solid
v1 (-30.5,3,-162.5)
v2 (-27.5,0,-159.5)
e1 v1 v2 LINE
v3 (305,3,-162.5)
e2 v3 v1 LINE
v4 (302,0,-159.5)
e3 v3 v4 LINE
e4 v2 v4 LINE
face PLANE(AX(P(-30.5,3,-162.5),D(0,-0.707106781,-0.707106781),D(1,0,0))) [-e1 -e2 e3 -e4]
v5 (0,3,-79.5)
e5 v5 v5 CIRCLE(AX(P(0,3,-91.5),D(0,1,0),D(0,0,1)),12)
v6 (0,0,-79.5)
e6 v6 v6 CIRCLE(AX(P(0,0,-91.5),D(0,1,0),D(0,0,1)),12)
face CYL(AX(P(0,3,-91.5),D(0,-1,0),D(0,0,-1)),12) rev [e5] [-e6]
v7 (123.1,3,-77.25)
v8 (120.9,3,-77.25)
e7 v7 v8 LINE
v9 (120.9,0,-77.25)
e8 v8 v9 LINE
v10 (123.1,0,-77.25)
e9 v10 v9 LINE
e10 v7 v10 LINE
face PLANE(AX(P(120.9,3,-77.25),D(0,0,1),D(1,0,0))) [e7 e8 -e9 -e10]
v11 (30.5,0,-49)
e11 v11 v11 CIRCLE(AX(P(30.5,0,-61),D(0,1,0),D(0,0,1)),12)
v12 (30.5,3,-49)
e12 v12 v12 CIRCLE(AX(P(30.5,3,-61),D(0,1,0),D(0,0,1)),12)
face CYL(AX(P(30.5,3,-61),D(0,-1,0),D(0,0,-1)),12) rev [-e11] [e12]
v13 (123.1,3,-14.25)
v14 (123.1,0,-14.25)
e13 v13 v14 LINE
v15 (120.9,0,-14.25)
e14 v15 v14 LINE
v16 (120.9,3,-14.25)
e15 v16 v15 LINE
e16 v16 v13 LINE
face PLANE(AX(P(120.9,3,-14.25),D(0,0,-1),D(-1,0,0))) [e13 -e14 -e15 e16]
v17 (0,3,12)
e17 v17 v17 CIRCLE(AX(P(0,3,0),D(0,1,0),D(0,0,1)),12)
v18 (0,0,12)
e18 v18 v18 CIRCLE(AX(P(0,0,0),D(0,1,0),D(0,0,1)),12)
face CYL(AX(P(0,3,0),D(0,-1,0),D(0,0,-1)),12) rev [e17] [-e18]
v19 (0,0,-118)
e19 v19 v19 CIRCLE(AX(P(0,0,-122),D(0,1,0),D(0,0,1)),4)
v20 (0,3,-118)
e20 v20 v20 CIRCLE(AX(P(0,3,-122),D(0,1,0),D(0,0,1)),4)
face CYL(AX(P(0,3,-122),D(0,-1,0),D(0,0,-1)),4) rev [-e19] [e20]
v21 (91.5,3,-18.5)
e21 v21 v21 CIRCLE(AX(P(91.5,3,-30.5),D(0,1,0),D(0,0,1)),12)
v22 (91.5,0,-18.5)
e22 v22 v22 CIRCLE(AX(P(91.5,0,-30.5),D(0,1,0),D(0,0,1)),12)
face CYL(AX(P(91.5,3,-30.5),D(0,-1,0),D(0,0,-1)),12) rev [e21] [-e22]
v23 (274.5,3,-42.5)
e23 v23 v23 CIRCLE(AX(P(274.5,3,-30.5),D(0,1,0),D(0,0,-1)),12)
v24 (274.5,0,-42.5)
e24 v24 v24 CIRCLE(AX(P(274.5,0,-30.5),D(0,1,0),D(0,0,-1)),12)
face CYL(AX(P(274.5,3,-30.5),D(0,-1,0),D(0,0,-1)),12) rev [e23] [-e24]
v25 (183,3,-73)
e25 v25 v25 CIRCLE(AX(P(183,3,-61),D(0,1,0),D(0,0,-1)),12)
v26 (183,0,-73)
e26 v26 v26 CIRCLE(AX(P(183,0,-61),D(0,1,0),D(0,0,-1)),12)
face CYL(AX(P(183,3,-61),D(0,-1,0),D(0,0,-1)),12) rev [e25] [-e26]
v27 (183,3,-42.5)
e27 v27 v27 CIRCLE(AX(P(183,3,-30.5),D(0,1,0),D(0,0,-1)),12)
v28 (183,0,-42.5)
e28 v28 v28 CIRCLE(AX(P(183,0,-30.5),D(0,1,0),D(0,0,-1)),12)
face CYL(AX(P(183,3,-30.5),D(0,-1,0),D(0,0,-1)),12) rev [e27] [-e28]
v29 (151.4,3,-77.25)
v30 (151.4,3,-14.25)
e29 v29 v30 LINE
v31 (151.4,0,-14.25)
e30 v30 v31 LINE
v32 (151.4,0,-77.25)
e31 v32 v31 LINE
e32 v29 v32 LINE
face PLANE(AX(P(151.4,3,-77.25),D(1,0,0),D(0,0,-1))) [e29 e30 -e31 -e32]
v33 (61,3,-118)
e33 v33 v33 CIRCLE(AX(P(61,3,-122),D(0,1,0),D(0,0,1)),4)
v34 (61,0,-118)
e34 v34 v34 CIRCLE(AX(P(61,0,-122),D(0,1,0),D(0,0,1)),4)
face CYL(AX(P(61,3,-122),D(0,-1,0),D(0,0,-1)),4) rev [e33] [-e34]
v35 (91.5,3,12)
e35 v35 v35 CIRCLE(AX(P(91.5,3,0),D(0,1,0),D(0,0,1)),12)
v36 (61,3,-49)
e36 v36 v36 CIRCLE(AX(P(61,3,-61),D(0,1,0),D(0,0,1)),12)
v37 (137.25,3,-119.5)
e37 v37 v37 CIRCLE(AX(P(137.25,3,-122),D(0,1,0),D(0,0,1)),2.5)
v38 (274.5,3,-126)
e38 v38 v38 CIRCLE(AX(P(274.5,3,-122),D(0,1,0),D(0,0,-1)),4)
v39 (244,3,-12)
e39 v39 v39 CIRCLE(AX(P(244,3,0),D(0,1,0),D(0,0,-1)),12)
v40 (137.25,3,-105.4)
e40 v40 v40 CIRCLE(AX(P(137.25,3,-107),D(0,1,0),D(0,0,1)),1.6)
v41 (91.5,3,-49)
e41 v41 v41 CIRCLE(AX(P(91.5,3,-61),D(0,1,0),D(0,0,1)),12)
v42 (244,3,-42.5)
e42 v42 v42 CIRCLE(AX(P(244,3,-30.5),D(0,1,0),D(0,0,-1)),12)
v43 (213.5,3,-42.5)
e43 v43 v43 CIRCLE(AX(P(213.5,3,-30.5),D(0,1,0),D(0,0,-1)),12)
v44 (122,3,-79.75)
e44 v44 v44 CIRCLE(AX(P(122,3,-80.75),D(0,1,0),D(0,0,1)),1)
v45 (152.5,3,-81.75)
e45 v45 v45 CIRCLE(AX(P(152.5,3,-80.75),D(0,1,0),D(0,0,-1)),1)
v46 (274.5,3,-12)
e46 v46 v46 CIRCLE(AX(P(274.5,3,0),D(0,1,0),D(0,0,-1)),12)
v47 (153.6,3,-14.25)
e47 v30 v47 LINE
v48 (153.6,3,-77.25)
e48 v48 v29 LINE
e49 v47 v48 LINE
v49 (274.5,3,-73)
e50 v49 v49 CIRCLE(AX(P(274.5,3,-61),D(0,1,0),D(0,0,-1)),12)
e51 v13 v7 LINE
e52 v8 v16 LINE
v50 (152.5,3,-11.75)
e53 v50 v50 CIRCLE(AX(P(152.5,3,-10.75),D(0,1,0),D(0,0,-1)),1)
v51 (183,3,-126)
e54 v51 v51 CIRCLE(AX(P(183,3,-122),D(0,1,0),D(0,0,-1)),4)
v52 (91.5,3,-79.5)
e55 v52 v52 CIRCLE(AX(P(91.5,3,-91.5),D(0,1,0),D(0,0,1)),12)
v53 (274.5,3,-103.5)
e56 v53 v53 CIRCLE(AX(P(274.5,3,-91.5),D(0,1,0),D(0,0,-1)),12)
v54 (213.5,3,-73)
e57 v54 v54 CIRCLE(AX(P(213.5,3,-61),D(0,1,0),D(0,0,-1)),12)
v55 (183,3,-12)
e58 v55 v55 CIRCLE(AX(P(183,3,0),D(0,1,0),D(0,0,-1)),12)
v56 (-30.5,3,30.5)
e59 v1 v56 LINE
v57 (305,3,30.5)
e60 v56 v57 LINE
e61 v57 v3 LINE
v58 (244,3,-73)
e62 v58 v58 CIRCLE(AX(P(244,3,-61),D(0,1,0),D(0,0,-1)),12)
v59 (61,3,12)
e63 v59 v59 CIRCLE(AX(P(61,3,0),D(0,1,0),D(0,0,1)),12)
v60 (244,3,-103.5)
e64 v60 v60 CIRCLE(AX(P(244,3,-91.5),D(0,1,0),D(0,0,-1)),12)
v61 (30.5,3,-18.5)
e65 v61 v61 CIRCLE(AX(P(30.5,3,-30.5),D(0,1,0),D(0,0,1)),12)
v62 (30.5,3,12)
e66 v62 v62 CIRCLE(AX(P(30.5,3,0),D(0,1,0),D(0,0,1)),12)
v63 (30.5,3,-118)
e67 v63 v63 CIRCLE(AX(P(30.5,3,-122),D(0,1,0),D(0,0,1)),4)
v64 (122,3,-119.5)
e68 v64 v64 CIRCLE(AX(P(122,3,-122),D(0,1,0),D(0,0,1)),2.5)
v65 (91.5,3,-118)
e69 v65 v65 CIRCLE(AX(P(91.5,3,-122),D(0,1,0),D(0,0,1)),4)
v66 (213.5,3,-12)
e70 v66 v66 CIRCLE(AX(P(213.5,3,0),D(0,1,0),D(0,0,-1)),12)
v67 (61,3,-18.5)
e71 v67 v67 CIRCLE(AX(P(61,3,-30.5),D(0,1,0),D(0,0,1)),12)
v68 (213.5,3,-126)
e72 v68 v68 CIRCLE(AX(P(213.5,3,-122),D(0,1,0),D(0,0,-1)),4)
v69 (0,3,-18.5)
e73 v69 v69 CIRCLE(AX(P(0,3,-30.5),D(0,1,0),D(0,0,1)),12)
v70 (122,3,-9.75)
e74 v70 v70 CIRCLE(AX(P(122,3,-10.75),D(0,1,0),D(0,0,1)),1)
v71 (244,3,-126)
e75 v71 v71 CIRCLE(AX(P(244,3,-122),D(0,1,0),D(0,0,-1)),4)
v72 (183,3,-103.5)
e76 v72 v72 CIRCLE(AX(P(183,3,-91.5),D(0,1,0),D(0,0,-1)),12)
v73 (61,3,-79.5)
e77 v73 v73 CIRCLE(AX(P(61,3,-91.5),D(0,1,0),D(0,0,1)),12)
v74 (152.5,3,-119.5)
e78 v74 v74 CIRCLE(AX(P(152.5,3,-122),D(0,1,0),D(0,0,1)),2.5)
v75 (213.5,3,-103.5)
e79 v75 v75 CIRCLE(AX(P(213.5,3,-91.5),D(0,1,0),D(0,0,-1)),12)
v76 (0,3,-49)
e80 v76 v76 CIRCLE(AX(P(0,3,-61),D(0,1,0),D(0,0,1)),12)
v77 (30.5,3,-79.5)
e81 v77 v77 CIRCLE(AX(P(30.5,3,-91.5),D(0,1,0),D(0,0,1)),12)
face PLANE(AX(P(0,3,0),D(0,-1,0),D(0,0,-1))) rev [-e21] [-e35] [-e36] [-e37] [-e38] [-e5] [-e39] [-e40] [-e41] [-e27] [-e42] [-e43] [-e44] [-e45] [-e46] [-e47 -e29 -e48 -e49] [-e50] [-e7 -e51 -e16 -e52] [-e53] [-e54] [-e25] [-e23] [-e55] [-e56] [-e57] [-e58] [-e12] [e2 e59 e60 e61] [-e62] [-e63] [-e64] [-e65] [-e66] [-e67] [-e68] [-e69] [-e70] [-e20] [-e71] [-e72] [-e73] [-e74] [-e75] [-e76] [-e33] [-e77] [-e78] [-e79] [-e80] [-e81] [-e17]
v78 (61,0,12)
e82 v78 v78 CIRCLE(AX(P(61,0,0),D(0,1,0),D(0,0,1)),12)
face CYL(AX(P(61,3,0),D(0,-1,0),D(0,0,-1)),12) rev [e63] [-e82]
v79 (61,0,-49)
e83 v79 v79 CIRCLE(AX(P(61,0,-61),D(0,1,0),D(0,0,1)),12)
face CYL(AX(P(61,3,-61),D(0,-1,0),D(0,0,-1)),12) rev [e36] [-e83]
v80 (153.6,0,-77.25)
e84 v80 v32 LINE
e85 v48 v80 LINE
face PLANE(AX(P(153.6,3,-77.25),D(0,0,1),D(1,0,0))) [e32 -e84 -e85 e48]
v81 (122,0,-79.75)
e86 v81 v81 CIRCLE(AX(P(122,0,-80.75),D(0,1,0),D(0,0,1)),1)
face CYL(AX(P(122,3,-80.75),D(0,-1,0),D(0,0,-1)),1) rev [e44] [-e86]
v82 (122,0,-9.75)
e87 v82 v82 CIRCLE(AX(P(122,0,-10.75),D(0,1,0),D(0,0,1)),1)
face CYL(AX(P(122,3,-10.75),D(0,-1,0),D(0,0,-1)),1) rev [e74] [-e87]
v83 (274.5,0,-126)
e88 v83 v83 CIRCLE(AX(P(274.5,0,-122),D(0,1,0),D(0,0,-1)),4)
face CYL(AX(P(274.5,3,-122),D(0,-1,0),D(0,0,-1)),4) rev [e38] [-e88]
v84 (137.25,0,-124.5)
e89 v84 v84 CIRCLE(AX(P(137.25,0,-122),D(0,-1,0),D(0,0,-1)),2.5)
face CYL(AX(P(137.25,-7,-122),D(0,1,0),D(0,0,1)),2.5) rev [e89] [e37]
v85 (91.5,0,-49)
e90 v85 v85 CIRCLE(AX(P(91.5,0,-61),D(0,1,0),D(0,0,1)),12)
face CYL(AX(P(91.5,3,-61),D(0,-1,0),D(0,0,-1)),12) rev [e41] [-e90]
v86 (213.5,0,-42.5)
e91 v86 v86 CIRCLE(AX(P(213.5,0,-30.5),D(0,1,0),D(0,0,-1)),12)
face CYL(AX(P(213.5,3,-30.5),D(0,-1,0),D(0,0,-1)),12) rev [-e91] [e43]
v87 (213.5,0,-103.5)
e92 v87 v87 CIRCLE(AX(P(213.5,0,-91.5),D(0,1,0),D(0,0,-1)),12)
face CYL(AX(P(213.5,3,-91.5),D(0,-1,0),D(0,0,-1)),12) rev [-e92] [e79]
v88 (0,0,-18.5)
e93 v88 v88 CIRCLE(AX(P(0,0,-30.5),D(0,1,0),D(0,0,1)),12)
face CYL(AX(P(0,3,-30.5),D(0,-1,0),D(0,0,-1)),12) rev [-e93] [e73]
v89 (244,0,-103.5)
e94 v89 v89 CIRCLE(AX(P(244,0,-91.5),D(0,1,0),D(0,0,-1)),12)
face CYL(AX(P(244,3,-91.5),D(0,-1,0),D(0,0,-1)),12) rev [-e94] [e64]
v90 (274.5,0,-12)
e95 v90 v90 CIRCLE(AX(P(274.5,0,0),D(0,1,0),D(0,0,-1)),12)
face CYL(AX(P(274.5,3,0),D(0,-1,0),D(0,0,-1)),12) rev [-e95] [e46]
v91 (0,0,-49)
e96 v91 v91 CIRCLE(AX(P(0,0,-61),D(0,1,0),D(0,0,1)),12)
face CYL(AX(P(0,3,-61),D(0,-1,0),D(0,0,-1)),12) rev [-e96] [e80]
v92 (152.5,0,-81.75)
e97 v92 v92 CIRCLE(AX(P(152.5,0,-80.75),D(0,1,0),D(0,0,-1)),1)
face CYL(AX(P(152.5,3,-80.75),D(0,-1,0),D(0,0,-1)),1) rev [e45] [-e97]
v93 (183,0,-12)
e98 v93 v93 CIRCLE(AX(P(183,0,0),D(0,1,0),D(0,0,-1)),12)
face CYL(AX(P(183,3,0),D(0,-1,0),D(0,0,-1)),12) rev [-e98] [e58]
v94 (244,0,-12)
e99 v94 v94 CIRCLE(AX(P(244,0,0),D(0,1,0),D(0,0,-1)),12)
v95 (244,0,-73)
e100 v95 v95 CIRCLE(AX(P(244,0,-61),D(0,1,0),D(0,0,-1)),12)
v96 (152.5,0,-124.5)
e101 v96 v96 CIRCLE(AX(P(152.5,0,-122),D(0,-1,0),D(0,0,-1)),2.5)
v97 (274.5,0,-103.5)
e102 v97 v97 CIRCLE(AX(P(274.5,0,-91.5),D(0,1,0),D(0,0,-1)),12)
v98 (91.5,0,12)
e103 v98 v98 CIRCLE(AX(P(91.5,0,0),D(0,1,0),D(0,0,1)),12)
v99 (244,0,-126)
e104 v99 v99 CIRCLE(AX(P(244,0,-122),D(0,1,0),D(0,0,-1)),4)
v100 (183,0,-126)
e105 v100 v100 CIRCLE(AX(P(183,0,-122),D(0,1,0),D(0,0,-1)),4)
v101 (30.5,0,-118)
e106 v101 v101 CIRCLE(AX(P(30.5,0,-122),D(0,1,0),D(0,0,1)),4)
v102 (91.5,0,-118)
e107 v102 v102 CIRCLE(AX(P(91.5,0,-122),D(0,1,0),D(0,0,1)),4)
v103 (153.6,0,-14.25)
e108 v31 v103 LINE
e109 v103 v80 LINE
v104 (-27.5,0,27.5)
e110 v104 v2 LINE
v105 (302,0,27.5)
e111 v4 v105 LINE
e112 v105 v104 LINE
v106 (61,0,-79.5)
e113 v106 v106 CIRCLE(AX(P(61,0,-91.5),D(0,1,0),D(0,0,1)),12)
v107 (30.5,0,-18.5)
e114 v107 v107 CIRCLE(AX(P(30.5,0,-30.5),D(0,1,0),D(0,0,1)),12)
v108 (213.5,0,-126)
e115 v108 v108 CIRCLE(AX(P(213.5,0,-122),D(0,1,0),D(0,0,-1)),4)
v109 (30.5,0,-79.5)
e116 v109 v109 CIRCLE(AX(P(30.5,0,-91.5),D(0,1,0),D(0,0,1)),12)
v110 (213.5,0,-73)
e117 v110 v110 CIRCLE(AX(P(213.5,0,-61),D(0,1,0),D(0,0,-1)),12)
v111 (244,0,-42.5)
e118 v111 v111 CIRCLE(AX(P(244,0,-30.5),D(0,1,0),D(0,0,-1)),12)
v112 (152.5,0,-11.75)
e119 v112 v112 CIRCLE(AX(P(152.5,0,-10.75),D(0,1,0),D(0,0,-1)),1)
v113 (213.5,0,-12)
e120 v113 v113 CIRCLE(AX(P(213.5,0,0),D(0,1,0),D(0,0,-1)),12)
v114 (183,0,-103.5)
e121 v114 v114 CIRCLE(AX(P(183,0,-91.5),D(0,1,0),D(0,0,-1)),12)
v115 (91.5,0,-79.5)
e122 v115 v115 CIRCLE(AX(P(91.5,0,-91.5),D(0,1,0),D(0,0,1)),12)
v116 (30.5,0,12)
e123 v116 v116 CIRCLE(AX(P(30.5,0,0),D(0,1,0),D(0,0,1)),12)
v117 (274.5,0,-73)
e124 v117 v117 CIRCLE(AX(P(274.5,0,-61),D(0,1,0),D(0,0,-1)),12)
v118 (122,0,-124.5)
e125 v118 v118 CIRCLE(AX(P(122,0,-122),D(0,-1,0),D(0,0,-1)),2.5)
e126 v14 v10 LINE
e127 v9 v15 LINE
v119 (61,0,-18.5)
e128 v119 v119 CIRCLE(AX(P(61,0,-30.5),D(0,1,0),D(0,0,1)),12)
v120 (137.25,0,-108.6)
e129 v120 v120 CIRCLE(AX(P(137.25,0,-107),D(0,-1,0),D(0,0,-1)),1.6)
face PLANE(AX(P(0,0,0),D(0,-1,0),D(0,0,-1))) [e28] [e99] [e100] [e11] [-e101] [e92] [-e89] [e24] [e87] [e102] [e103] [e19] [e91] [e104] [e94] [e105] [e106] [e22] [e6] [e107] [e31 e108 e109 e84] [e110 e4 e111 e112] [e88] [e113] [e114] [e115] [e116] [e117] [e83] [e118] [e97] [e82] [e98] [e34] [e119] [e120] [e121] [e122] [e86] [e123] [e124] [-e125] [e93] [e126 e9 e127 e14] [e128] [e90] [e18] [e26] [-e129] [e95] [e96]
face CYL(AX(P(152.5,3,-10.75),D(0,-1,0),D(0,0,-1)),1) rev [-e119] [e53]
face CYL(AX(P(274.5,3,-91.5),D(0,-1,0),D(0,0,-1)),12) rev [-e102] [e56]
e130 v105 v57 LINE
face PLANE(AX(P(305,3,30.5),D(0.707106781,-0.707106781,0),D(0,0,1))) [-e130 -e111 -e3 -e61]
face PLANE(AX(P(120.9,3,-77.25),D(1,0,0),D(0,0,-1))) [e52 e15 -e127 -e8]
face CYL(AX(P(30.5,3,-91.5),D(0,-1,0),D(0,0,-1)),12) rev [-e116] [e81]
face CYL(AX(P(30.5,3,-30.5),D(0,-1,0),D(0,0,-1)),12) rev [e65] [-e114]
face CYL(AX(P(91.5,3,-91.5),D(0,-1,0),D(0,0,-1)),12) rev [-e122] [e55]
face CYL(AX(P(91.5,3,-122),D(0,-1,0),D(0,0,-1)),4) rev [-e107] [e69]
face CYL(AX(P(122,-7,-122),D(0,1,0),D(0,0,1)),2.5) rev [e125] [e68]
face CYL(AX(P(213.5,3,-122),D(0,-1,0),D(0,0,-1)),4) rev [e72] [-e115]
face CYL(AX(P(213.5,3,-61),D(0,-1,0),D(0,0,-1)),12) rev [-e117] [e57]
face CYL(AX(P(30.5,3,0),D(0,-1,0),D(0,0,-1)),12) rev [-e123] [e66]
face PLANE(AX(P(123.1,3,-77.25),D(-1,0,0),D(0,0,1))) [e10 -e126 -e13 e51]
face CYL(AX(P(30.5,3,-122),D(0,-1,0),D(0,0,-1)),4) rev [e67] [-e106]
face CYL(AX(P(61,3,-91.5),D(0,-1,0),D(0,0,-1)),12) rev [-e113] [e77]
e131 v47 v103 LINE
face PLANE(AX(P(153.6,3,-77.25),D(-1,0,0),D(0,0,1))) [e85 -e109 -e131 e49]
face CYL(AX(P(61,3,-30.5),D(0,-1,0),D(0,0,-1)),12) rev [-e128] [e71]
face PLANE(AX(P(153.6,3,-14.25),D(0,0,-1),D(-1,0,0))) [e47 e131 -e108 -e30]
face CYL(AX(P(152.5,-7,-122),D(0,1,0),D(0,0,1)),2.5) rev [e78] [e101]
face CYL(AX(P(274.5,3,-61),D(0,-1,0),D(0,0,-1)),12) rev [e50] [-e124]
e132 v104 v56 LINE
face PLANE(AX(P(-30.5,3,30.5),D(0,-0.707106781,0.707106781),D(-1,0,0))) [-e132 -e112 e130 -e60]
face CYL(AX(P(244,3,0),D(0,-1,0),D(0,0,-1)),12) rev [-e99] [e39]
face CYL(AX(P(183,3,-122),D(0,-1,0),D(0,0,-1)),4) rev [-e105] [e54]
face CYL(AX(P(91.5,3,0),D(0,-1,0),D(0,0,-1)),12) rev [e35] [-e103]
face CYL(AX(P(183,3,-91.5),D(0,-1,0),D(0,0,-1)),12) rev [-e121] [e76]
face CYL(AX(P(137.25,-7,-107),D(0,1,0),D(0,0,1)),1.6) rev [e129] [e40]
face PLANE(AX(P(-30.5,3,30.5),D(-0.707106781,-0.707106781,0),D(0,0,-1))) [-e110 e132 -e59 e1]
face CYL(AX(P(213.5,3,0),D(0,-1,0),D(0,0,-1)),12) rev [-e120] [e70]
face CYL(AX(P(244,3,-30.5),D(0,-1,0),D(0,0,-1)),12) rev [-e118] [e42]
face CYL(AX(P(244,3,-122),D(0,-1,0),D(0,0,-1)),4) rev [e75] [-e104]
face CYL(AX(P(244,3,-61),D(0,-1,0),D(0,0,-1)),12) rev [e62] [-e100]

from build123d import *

# Parameters (mm, degrees)
SKETCH2_W           = 335.5
SKETCH2_H           = 193
SKETCH2_R           = 12
SKETCH2_R_2         = 1
SKETCH2_R_3         = 4
SKETCH2_W_2         = 2.2
SKETCH2_H_2         = 63
BOSS_EXTRUDE1_DEPTH = 3
SKETCH3_R           = 2.5
SKETCH3_R_2         = 1.6
CUT_EXTRUDE1_DEPTH  = 10
CHAMFER2_SIZE       = 3


with BuildPart() as part:
    # Sketch2 → Boss-Extrude1 (new body)
    with BuildSketch(Plane(origin=(0, 0, 0), x_dir=(1, 0, 0), z_dir=(0, 1, 0))):
        with Locations((137.25, 66)):
            Rectangle(SKETCH2_W, SKETCH2_H)
        with Locations(Location((0, 0, 0), (0, 0, 270))):
            Circle(SKETCH2_R, mode=Mode.SUBTRACT)
        with Locations(Location((30.5, 0, 0), (0, 0, 270))):
            Circle(SKETCH2_R, mode=Mode.SUBTRACT)
        with Locations(Location((61, 0, 0), (0, 0, 270))):
            Circle(SKETCH2_R, mode=Mode.SUBTRACT)
        with Locations(Location((91.5, 0, 0), (0, 0, 270))):
            Circle(SKETCH2_R, mode=Mode.SUBTRACT)
        with Locations(Location((30.5, 30.5, 0), (0, 0, 270))):
            Circle(SKETCH2_R, mode=Mode.SUBTRACT)
        with Locations(Location((61, 30.5, 0), (0, 0, 270))):
            Circle(SKETCH2_R, mode=Mode.SUBTRACT)
        with Locations(Location((91.5, 30.5, 0), (0, 0, 270))):
            Circle(SKETCH2_R, mode=Mode.SUBTRACT)
        with Locations(Location((30.5, 61, 0), (0, 0, 270))):
            Circle(SKETCH2_R, mode=Mode.SUBTRACT)
        with Locations(Location((61, 61, 0), (0, 0, 270))):
            Circle(SKETCH2_R, mode=Mode.SUBTRACT)
        with Locations(Location((91.5, 61, 0), (0, 0, 270))):
            Circle(SKETCH2_R, mode=Mode.SUBTRACT)
        with Locations(Location((30.5, 91.5, 0), (0, 0, 270))):
            Circle(SKETCH2_R, mode=Mode.SUBTRACT)
        with Locations(Location((61, 91.5, 0), (0, 0, 270))):
            Circle(SKETCH2_R, mode=Mode.SUBTRACT)
        with Locations(Location((91.5, 91.5, 0), (0, 0, 270))):
            Circle(SKETCH2_R, mode=Mode.SUBTRACT)
        with Locations(Location((0, 30.5, 0), (0, 0, 270))):
            Circle(SKETCH2_R, mode=Mode.SUBTRACT)
        with Locations(Location((0, 61, 0), (0, 0, 270))):
            Circle(SKETCH2_R, mode=Mode.SUBTRACT)
        with Locations(Location((0, 91.5, 0), (0, 0, 270))):
            Circle(SKETCH2_R, mode=Mode.SUBTRACT)
        with Locations(Location((122, 80.75, 0), (0, 0, 270))):
            Circle(SKETCH2_R_2, mode=Mode.SUBTRACT)
        with Locations(Location((122, 10.75, 0), (0, 0, 270))):
            Circle(SKETCH2_R_2, mode=Mode.SUBTRACT)
        with Locations(Location((0, 122, 0), (0, 0, 270))):
            Circle(SKETCH2_R_3, mode=Mode.SUBTRACT)
        with Locations(Location((30.5, 122, 0), (0, 0, 270))):
            Circle(SKETCH2_R_3, mode=Mode.SUBTRACT)
        with Locations(Location((61, 122, 0), (0, 0, 270))):
            Circle(SKETCH2_R_3, mode=Mode.SUBTRACT)
        with Locations(Location((91.5, 122, 0), (0, 0, 270))):
            Circle(SKETCH2_R_3, mode=Mode.SUBTRACT)
        with Locations(Location((183, 122, 0), (0, 0, 90))):
            Circle(SKETCH2_R_3, mode=Mode.SUBTRACT)
        with Locations(Location((213.5, 122, 0), (0, 0, 90))):
            Circle(SKETCH2_R_3, mode=Mode.SUBTRACT)
        with Locations(Location((244, 122, 0), (0, 0, 90))):
            Circle(SKETCH2_R_3, mode=Mode.SUBTRACT)
        with Locations(Location((274.5, 122, 0), (0, 0, 90))):
            Circle(SKETCH2_R_3, mode=Mode.SUBTRACT)
        with Locations(Location((152.5, 10.75, 0), (0, 0, 90))):
            Circle(SKETCH2_R_2, mode=Mode.SUBTRACT)
        with Locations(Location((152.5, 80.75, 0), (0, 0, 90))):
            Circle(SKETCH2_R_2, mode=Mode.SUBTRACT)
        with Locations(Location((274.5, 91.5, 0), (0, 0, 90))):
            Circle(SKETCH2_R, mode=Mode.SUBTRACT)
        with Locations(Location((274.5, 61, 0), (0, 0, 90))):
            Circle(SKETCH2_R, mode=Mode.SUBTRACT)
        with Locations(Location((274.5, 30.5, 0), (0, 0, 90))):
            Circle(SKETCH2_R, mode=Mode.SUBTRACT)
        with Locations(Location((183, 91.5, 0), (0, 0, 90))):
            Circle(SKETCH2_R, mode=Mode.SUBTRACT)
        with Locations(Location((213.5, 91.5, 0), (0, 0, 90))):
            Circle(SKETCH2_R, mode=Mode.SUBTRACT)
        with Locations(Location((244, 91.5, 0), (0, 0, 90))):
            Circle(SKETCH2_R, mode=Mode.SUBTRACT)
        with Locations(Location((183, 61, 0), (0, 0, 90))):
            Circle(SKETCH2_R, mode=Mode.SUBTRACT)
        with Locations(Location((213.5, 61, 0), (0, 0, 90))):
            Circle(SKETCH2_R, mode=Mode.SUBTRACT)
        with Locations(Location((244, 61, 0), (0, 0, 90))):
            Circle(SKETCH2_R, mode=Mode.SUBTRACT)
        with Locations(Location((183, 30.5, 0), (0, 0, 90))):
            Circle(SKETCH2_R, mode=Mode.SUBTRACT)
        with Locations(Location((213.5, 30.5, 0), (0, 0, 90))):
            Circle(SKETCH2_R, mode=Mode.SUBTRACT)
        with Locations(Location((244, 30.5, 0), (0, 0, 90))):
            Circle(SKETCH2_R, mode=Mode.SUBTRACT)
        with Locations(Location((183, 0, 0), (0, 0, 90))):
            Circle(SKETCH2_R, mode=Mode.SUBTRACT)
        with Locations(Location((213.5, 0, 0), (0, 0, 90))):
            Circle(SKETCH2_R, mode=Mode.SUBTRACT)
        with Locations(Location((244, 0, 0), (0, 0, 90))):
            Circle(SKETCH2_R, mode=Mode.SUBTRACT)
        with Locations(Location((274.5, 0, 0), (0, 0, 90))):
            Circle(SKETCH2_R, mode=Mode.SUBTRACT)
        with Locations((122, 45.75)):
            Rectangle(SKETCH2_W_2, SKETCH2_H_2, mode=Mode.SUBTRACT)
        with Locations((152.5, 45.75)):
            Rectangle(SKETCH2_W_2, SKETCH2_H_2, mode=Mode.SUBTRACT)
    extrude(amount=BOSS_EXTRUDE1_DEPTH)

    # Sketch3 → Cut-Extrude1 (cut)
    with BuildSketch(Plane(origin=(0, 3, 0), x_dir=(1, 0, 0), z_dir=(0, 1, 0))):
        with Locations(Location((122, 122, 0), (0, 0, 270))):
            Circle(SKETCH3_R)
        with Locations(Location((137.25, 122, 0), (0, 0, 270))):
            Circle(SKETCH3_R)
        with Locations(Location((152.5, 122, 0), (0, 0, 270))):
            Circle(SKETCH3_R)
        with Locations(Location((137.25, 107, 0), (0, 0, 270))):
            Circle(SKETCH3_R_2)
    extrude(amount=-CUT_EXTRUDE1_DEPTH, mode=Mode.SUBTRACT)

    # Chamfer2
    chamfer2_edges = [part.edges().sort_by_distance(p)[0] for p in [
        (-30.5, 0, -66),
        (137.25, 0, 30.5),
        (305, 0, -66),
        (137.25, 0, -162.5),
    ]]
    chamfer(chamfer2_edges, length=CHAMFER2_SIZE - 0.0001)  # a hair under: the kernel refuses the full size


solid = part.part
